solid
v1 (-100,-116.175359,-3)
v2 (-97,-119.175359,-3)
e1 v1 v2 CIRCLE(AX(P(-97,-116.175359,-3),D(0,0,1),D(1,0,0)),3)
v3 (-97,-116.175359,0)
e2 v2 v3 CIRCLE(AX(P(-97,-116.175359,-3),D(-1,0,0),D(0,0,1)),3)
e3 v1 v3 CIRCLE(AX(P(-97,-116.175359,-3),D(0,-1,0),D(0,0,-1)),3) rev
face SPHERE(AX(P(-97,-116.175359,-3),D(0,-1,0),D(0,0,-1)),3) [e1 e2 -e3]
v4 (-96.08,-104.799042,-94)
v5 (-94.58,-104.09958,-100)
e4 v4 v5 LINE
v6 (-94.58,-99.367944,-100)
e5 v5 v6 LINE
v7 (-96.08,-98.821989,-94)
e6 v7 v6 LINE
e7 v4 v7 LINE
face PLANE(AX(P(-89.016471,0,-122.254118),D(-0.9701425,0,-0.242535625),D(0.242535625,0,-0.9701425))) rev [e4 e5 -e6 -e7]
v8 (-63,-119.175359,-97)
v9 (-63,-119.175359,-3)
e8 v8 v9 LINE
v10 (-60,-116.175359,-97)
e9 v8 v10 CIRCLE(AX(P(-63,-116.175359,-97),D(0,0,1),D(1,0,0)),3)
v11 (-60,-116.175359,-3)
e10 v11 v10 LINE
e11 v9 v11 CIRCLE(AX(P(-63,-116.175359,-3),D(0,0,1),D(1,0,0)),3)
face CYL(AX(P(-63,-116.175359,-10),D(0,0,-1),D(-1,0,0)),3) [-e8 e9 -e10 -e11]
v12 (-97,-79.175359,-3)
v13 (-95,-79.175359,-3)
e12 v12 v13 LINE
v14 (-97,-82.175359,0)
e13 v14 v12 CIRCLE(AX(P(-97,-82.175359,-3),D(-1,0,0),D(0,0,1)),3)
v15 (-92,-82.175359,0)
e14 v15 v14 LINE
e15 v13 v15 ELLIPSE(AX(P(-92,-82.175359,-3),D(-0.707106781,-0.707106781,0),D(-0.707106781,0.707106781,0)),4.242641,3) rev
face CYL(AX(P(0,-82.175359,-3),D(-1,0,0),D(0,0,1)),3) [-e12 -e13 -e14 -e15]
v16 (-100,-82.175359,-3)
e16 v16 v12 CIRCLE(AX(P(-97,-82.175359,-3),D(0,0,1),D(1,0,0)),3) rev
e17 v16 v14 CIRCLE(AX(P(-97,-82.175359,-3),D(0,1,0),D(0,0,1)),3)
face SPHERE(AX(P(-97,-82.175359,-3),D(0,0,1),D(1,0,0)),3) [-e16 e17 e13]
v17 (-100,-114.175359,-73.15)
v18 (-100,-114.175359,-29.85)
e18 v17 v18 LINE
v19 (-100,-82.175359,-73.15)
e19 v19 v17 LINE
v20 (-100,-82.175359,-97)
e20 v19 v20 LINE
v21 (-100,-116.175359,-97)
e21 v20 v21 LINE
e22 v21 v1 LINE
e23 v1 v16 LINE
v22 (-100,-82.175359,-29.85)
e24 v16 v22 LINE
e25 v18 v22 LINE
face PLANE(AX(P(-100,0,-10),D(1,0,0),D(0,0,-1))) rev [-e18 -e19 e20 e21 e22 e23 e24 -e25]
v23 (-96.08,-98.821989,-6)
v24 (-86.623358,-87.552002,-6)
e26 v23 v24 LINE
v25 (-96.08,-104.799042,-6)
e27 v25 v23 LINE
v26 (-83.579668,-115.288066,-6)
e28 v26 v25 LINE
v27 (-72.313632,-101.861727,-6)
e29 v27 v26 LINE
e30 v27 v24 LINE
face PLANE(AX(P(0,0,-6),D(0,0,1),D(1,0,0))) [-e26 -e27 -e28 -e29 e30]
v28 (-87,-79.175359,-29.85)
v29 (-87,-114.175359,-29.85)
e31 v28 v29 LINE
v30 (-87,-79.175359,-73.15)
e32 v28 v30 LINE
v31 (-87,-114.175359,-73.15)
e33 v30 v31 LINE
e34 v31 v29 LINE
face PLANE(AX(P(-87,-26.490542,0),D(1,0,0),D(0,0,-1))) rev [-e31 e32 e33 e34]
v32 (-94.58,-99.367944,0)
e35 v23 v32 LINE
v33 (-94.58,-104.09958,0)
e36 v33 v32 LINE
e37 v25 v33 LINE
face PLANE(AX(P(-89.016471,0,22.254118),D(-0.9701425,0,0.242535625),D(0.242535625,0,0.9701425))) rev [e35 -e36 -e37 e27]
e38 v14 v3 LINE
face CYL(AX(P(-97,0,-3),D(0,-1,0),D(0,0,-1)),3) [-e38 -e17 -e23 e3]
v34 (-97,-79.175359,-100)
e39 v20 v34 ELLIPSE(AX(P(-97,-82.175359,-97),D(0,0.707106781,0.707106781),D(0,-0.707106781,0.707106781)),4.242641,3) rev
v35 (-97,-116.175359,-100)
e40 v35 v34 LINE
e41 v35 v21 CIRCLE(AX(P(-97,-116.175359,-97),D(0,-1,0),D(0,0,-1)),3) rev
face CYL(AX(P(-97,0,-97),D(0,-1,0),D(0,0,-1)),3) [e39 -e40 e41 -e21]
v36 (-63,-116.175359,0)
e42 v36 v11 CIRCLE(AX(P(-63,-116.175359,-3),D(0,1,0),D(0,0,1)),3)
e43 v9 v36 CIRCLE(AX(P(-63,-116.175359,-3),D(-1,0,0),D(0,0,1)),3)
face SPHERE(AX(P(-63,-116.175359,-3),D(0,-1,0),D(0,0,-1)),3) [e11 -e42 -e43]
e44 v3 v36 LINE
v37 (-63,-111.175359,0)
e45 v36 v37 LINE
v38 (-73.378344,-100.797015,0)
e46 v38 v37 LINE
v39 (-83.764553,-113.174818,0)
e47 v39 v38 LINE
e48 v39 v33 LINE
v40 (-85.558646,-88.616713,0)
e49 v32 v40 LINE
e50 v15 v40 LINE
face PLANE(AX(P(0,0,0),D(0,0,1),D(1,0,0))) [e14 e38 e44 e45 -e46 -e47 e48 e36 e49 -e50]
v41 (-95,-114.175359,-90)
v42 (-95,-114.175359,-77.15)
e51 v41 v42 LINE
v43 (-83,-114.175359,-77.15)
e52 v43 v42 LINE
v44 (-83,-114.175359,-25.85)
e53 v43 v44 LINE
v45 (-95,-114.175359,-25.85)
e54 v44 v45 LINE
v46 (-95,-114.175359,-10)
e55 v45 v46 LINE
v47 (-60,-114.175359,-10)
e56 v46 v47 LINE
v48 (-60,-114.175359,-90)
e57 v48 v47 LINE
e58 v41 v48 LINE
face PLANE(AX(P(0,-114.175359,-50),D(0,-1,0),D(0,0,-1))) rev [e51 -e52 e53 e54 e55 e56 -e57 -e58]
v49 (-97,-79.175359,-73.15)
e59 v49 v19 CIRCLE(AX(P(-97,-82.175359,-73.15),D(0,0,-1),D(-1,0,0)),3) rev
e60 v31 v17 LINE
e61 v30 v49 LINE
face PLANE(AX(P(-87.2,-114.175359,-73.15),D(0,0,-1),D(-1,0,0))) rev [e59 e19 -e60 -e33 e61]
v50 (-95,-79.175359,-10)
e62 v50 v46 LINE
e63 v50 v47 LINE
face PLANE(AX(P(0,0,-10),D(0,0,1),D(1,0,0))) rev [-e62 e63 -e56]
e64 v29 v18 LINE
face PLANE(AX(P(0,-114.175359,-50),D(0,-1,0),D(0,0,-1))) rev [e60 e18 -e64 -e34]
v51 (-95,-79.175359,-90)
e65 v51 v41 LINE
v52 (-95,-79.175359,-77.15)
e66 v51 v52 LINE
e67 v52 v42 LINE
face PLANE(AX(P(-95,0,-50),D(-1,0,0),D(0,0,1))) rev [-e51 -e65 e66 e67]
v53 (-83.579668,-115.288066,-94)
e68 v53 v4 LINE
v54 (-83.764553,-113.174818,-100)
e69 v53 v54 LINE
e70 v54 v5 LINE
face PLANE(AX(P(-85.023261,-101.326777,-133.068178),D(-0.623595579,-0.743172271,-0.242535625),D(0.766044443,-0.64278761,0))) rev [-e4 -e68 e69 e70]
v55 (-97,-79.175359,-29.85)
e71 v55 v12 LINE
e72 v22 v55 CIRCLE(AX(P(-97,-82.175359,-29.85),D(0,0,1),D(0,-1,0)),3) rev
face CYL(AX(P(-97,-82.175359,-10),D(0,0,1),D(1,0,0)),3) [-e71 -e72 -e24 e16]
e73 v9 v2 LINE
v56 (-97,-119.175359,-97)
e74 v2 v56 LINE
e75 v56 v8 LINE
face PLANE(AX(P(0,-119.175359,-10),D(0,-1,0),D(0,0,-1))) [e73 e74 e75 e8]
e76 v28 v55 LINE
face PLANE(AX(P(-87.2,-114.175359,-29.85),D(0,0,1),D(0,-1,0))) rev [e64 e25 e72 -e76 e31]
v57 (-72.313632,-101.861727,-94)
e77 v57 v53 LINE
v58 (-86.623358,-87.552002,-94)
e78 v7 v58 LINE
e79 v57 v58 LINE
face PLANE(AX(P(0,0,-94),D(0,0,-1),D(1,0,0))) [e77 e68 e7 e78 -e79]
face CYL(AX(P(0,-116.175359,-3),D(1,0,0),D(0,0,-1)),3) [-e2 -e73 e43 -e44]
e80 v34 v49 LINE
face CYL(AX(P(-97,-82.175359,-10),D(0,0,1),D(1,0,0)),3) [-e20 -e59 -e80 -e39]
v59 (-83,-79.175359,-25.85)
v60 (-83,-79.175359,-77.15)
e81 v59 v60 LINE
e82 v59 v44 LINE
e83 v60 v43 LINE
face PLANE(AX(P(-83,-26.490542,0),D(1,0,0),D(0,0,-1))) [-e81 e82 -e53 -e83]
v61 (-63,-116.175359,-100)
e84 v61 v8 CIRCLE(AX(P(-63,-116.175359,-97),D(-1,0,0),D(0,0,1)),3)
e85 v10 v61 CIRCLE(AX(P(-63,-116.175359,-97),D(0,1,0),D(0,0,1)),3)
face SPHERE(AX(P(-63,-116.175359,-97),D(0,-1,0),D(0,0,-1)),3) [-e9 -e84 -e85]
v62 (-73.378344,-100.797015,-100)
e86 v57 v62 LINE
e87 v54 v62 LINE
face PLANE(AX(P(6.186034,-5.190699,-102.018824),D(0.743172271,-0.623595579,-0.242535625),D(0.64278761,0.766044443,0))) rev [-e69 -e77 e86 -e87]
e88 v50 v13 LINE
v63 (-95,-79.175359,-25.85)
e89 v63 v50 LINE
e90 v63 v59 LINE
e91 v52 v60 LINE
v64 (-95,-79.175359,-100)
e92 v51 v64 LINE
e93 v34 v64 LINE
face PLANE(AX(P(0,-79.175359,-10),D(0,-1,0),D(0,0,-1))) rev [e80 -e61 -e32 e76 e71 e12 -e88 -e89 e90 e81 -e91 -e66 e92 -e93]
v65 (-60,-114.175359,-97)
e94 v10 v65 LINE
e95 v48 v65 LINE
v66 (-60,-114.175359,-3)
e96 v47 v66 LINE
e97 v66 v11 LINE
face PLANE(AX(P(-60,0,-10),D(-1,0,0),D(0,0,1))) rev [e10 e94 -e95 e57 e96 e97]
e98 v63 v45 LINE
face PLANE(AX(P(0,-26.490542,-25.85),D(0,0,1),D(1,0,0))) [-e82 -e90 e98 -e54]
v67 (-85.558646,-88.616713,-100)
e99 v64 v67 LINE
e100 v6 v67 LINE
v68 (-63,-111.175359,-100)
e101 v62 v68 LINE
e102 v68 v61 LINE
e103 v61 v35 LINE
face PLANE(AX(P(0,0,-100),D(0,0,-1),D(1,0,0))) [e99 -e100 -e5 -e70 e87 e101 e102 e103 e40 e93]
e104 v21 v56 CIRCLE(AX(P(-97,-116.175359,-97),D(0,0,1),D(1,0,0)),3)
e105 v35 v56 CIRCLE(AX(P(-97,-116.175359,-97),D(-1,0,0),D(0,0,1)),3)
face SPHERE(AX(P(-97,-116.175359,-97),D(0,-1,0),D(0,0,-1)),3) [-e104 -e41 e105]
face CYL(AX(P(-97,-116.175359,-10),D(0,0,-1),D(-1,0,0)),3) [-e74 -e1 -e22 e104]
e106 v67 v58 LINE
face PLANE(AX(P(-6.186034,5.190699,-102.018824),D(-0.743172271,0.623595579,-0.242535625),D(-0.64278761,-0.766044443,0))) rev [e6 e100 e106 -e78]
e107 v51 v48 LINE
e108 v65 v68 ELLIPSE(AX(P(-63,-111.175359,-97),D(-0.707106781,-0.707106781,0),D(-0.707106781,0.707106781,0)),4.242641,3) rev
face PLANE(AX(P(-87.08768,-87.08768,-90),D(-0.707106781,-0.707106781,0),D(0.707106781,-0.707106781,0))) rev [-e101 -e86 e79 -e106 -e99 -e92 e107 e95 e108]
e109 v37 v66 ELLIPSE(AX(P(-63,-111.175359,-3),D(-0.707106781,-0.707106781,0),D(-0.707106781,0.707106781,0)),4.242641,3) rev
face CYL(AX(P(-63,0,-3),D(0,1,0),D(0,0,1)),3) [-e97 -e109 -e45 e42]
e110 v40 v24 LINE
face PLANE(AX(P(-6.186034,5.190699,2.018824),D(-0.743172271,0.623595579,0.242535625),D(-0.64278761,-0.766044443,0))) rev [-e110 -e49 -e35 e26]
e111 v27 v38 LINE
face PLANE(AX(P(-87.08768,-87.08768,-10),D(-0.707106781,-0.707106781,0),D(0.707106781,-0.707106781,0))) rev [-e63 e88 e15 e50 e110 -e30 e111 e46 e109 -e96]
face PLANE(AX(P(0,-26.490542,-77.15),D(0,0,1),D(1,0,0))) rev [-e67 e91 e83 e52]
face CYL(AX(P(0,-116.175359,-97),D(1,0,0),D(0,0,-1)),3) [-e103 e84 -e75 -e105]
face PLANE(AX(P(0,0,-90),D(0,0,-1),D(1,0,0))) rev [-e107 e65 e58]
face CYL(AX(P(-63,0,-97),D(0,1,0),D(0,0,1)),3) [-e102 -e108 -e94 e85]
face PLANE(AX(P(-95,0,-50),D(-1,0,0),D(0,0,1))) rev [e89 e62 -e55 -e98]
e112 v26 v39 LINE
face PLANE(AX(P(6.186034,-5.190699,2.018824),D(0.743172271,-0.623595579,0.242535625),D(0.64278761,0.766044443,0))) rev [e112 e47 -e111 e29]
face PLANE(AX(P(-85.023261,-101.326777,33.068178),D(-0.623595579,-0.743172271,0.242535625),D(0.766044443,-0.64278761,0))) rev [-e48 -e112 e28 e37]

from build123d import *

# Parameters (mm, degrees)
EXTRUDE_1_DEPTH     = 10
EXTRUDE_3_DEPTH     = 40
FILLET_2_R          = 3
FILLET_3_R          = 3
SKETCH_10_W         = 43.3
SKETCH_10_H         = 35
CUT_EXTRUDE_1_DEPTH = 12.8
EXTRUDE_4_DEPTH     = 35


with BuildPart() as part:
    # 草图3 → 凸台-拉伸1 (new body)
    with BuildSketch(Plane.XY):
        Polygon((-100, -79.175359259), (-100, -119.175359259), (-60, -119.175359259), (-60, -114.175359259), (-95, -79.175359259), align=None)
    extrude(amount=-EXTRUDE_1_DEPTH)

    # 草图5 → 切除-放样1 section 0
    with BuildSketch(Plane.XY.offset(-6)):
        with BuildLine():
            Line((-96.08, -104.799041882), (-96.08, -98.821989002))
            Line((-96.08, -98.821989002), (-81.709132385, -81.695455893))
            Line((-81.709132385, -81.695455893), (-66.265676412, -94.654054104))
            Line((-66.265676412, -94.654054104), (-83.579668035, -115.288065824))
            Line((-83.579668035, -115.288065824), (-96.08, -104.799041882))
        make_face()
    # 草图8 → 切除-放样1 section 1
    with BuildSketch(Plane.XY):
        with BuildLine():
            Line((-94.58, -104.099580395), (-94.58, -99.367944353))
            Line((-94.58, -99.367944353), (-80.56006572, -82.659637307))
            Line((-80.56006572, -82.659637307), (-67.414743077, -93.68987269))
            Line((-67.414743077, -93.68987269), (-83.764553285, -113.174817744))
            Line((-83.764553285, -113.174817744), (-94.58, -104.099580395))
        make_face()
    loft(mode=Mode.SUBTRACT)

    # 草图9 → 凸台-拉伸3 (add)
    with BuildSketch(Plane(origin=(0, 0, -10), x_dir=(-1, 0, 0), z_dir=(0, 0, -1))):
        Polygon((95, -79.175359259), (95, -114.175359259), (60, -114.175359259), (60, -119.175359259), (100, -119.175359259), (100, -79.175359259), align=None)
    extrude(amount=EXTRUDE_3_DEPTH)

    # 镜向2: part across plane


with BuildPart() as part_1:
    add(part.part)
    add(part.part.mirror(Plane(origin=(0, 0, -50), x_dir=(1, 0, 0), z_dir=(0, 0, -1))))

    # 圆角2
    fillet_2_edges = [part_1.edges().sort_by_distance(p)[0] for p in [
        (-60, -116.675359259, -100),
        (-60, -116.675359259, 0),
        (-100, -99.175359259, -100),
        (-100, -99.175359259, 0),
        (-100, -79.175359259, -50),
        (-97.5, -79.175359259, 0),
    ]]
    fillet(fillet_2_edges, radius=FILLET_2_R)

    # 圆角3
    fillet_3_edges = [part_1.edges().sort_by_distance(p)[0] for p in [
        (-80, -119.175359259, -100),
        (-80, -119.175359259, 0),
        (-100, -119.175359259, -50),
        (-60, -119.175359259, -50),
        (-99.121320344, -119.175359259, -0.878679656),
        (-99.121320344, -119.175359259, -99.121320344),
        (-60.878679656, -119.175359259, -0.878679656),
        (-60.878679656, -119.175359259, -99.121320344),
    ]]
    fillet(fillet_3_edges, radius=FILLET_3_R)

    # 草图10 → 切除-拉伸1 (cut)
    with BuildSketch(Plane.ZY.offset(100)):
        with Locations((-51.5, -96.675359259)):
            Rectangle(SKETCH_10_W, SKETCH_10_H)
    extrude(amount=-CUT_EXTRUDE_1_DEPTH, mode=Mode.SUBTRACT)

    # 草图11 → 凸台-拉伸4 (add)
    with BuildSketch(Plane(origin=(0, -114.175359259, 0), x_dir=(1, 0, 0), z_dir=(0, 1, 0))):
        Polygon((-95, 25.85), (-83, 25.85), (-83, 77.15), (-95, 77.15), (-95, 73.15), (-87, 73.15), (-87, 29.85), (-95, 29.85), align=None)
    extrude(amount=EXTRUDE_4_DEPTH)


solid = part_1.part
